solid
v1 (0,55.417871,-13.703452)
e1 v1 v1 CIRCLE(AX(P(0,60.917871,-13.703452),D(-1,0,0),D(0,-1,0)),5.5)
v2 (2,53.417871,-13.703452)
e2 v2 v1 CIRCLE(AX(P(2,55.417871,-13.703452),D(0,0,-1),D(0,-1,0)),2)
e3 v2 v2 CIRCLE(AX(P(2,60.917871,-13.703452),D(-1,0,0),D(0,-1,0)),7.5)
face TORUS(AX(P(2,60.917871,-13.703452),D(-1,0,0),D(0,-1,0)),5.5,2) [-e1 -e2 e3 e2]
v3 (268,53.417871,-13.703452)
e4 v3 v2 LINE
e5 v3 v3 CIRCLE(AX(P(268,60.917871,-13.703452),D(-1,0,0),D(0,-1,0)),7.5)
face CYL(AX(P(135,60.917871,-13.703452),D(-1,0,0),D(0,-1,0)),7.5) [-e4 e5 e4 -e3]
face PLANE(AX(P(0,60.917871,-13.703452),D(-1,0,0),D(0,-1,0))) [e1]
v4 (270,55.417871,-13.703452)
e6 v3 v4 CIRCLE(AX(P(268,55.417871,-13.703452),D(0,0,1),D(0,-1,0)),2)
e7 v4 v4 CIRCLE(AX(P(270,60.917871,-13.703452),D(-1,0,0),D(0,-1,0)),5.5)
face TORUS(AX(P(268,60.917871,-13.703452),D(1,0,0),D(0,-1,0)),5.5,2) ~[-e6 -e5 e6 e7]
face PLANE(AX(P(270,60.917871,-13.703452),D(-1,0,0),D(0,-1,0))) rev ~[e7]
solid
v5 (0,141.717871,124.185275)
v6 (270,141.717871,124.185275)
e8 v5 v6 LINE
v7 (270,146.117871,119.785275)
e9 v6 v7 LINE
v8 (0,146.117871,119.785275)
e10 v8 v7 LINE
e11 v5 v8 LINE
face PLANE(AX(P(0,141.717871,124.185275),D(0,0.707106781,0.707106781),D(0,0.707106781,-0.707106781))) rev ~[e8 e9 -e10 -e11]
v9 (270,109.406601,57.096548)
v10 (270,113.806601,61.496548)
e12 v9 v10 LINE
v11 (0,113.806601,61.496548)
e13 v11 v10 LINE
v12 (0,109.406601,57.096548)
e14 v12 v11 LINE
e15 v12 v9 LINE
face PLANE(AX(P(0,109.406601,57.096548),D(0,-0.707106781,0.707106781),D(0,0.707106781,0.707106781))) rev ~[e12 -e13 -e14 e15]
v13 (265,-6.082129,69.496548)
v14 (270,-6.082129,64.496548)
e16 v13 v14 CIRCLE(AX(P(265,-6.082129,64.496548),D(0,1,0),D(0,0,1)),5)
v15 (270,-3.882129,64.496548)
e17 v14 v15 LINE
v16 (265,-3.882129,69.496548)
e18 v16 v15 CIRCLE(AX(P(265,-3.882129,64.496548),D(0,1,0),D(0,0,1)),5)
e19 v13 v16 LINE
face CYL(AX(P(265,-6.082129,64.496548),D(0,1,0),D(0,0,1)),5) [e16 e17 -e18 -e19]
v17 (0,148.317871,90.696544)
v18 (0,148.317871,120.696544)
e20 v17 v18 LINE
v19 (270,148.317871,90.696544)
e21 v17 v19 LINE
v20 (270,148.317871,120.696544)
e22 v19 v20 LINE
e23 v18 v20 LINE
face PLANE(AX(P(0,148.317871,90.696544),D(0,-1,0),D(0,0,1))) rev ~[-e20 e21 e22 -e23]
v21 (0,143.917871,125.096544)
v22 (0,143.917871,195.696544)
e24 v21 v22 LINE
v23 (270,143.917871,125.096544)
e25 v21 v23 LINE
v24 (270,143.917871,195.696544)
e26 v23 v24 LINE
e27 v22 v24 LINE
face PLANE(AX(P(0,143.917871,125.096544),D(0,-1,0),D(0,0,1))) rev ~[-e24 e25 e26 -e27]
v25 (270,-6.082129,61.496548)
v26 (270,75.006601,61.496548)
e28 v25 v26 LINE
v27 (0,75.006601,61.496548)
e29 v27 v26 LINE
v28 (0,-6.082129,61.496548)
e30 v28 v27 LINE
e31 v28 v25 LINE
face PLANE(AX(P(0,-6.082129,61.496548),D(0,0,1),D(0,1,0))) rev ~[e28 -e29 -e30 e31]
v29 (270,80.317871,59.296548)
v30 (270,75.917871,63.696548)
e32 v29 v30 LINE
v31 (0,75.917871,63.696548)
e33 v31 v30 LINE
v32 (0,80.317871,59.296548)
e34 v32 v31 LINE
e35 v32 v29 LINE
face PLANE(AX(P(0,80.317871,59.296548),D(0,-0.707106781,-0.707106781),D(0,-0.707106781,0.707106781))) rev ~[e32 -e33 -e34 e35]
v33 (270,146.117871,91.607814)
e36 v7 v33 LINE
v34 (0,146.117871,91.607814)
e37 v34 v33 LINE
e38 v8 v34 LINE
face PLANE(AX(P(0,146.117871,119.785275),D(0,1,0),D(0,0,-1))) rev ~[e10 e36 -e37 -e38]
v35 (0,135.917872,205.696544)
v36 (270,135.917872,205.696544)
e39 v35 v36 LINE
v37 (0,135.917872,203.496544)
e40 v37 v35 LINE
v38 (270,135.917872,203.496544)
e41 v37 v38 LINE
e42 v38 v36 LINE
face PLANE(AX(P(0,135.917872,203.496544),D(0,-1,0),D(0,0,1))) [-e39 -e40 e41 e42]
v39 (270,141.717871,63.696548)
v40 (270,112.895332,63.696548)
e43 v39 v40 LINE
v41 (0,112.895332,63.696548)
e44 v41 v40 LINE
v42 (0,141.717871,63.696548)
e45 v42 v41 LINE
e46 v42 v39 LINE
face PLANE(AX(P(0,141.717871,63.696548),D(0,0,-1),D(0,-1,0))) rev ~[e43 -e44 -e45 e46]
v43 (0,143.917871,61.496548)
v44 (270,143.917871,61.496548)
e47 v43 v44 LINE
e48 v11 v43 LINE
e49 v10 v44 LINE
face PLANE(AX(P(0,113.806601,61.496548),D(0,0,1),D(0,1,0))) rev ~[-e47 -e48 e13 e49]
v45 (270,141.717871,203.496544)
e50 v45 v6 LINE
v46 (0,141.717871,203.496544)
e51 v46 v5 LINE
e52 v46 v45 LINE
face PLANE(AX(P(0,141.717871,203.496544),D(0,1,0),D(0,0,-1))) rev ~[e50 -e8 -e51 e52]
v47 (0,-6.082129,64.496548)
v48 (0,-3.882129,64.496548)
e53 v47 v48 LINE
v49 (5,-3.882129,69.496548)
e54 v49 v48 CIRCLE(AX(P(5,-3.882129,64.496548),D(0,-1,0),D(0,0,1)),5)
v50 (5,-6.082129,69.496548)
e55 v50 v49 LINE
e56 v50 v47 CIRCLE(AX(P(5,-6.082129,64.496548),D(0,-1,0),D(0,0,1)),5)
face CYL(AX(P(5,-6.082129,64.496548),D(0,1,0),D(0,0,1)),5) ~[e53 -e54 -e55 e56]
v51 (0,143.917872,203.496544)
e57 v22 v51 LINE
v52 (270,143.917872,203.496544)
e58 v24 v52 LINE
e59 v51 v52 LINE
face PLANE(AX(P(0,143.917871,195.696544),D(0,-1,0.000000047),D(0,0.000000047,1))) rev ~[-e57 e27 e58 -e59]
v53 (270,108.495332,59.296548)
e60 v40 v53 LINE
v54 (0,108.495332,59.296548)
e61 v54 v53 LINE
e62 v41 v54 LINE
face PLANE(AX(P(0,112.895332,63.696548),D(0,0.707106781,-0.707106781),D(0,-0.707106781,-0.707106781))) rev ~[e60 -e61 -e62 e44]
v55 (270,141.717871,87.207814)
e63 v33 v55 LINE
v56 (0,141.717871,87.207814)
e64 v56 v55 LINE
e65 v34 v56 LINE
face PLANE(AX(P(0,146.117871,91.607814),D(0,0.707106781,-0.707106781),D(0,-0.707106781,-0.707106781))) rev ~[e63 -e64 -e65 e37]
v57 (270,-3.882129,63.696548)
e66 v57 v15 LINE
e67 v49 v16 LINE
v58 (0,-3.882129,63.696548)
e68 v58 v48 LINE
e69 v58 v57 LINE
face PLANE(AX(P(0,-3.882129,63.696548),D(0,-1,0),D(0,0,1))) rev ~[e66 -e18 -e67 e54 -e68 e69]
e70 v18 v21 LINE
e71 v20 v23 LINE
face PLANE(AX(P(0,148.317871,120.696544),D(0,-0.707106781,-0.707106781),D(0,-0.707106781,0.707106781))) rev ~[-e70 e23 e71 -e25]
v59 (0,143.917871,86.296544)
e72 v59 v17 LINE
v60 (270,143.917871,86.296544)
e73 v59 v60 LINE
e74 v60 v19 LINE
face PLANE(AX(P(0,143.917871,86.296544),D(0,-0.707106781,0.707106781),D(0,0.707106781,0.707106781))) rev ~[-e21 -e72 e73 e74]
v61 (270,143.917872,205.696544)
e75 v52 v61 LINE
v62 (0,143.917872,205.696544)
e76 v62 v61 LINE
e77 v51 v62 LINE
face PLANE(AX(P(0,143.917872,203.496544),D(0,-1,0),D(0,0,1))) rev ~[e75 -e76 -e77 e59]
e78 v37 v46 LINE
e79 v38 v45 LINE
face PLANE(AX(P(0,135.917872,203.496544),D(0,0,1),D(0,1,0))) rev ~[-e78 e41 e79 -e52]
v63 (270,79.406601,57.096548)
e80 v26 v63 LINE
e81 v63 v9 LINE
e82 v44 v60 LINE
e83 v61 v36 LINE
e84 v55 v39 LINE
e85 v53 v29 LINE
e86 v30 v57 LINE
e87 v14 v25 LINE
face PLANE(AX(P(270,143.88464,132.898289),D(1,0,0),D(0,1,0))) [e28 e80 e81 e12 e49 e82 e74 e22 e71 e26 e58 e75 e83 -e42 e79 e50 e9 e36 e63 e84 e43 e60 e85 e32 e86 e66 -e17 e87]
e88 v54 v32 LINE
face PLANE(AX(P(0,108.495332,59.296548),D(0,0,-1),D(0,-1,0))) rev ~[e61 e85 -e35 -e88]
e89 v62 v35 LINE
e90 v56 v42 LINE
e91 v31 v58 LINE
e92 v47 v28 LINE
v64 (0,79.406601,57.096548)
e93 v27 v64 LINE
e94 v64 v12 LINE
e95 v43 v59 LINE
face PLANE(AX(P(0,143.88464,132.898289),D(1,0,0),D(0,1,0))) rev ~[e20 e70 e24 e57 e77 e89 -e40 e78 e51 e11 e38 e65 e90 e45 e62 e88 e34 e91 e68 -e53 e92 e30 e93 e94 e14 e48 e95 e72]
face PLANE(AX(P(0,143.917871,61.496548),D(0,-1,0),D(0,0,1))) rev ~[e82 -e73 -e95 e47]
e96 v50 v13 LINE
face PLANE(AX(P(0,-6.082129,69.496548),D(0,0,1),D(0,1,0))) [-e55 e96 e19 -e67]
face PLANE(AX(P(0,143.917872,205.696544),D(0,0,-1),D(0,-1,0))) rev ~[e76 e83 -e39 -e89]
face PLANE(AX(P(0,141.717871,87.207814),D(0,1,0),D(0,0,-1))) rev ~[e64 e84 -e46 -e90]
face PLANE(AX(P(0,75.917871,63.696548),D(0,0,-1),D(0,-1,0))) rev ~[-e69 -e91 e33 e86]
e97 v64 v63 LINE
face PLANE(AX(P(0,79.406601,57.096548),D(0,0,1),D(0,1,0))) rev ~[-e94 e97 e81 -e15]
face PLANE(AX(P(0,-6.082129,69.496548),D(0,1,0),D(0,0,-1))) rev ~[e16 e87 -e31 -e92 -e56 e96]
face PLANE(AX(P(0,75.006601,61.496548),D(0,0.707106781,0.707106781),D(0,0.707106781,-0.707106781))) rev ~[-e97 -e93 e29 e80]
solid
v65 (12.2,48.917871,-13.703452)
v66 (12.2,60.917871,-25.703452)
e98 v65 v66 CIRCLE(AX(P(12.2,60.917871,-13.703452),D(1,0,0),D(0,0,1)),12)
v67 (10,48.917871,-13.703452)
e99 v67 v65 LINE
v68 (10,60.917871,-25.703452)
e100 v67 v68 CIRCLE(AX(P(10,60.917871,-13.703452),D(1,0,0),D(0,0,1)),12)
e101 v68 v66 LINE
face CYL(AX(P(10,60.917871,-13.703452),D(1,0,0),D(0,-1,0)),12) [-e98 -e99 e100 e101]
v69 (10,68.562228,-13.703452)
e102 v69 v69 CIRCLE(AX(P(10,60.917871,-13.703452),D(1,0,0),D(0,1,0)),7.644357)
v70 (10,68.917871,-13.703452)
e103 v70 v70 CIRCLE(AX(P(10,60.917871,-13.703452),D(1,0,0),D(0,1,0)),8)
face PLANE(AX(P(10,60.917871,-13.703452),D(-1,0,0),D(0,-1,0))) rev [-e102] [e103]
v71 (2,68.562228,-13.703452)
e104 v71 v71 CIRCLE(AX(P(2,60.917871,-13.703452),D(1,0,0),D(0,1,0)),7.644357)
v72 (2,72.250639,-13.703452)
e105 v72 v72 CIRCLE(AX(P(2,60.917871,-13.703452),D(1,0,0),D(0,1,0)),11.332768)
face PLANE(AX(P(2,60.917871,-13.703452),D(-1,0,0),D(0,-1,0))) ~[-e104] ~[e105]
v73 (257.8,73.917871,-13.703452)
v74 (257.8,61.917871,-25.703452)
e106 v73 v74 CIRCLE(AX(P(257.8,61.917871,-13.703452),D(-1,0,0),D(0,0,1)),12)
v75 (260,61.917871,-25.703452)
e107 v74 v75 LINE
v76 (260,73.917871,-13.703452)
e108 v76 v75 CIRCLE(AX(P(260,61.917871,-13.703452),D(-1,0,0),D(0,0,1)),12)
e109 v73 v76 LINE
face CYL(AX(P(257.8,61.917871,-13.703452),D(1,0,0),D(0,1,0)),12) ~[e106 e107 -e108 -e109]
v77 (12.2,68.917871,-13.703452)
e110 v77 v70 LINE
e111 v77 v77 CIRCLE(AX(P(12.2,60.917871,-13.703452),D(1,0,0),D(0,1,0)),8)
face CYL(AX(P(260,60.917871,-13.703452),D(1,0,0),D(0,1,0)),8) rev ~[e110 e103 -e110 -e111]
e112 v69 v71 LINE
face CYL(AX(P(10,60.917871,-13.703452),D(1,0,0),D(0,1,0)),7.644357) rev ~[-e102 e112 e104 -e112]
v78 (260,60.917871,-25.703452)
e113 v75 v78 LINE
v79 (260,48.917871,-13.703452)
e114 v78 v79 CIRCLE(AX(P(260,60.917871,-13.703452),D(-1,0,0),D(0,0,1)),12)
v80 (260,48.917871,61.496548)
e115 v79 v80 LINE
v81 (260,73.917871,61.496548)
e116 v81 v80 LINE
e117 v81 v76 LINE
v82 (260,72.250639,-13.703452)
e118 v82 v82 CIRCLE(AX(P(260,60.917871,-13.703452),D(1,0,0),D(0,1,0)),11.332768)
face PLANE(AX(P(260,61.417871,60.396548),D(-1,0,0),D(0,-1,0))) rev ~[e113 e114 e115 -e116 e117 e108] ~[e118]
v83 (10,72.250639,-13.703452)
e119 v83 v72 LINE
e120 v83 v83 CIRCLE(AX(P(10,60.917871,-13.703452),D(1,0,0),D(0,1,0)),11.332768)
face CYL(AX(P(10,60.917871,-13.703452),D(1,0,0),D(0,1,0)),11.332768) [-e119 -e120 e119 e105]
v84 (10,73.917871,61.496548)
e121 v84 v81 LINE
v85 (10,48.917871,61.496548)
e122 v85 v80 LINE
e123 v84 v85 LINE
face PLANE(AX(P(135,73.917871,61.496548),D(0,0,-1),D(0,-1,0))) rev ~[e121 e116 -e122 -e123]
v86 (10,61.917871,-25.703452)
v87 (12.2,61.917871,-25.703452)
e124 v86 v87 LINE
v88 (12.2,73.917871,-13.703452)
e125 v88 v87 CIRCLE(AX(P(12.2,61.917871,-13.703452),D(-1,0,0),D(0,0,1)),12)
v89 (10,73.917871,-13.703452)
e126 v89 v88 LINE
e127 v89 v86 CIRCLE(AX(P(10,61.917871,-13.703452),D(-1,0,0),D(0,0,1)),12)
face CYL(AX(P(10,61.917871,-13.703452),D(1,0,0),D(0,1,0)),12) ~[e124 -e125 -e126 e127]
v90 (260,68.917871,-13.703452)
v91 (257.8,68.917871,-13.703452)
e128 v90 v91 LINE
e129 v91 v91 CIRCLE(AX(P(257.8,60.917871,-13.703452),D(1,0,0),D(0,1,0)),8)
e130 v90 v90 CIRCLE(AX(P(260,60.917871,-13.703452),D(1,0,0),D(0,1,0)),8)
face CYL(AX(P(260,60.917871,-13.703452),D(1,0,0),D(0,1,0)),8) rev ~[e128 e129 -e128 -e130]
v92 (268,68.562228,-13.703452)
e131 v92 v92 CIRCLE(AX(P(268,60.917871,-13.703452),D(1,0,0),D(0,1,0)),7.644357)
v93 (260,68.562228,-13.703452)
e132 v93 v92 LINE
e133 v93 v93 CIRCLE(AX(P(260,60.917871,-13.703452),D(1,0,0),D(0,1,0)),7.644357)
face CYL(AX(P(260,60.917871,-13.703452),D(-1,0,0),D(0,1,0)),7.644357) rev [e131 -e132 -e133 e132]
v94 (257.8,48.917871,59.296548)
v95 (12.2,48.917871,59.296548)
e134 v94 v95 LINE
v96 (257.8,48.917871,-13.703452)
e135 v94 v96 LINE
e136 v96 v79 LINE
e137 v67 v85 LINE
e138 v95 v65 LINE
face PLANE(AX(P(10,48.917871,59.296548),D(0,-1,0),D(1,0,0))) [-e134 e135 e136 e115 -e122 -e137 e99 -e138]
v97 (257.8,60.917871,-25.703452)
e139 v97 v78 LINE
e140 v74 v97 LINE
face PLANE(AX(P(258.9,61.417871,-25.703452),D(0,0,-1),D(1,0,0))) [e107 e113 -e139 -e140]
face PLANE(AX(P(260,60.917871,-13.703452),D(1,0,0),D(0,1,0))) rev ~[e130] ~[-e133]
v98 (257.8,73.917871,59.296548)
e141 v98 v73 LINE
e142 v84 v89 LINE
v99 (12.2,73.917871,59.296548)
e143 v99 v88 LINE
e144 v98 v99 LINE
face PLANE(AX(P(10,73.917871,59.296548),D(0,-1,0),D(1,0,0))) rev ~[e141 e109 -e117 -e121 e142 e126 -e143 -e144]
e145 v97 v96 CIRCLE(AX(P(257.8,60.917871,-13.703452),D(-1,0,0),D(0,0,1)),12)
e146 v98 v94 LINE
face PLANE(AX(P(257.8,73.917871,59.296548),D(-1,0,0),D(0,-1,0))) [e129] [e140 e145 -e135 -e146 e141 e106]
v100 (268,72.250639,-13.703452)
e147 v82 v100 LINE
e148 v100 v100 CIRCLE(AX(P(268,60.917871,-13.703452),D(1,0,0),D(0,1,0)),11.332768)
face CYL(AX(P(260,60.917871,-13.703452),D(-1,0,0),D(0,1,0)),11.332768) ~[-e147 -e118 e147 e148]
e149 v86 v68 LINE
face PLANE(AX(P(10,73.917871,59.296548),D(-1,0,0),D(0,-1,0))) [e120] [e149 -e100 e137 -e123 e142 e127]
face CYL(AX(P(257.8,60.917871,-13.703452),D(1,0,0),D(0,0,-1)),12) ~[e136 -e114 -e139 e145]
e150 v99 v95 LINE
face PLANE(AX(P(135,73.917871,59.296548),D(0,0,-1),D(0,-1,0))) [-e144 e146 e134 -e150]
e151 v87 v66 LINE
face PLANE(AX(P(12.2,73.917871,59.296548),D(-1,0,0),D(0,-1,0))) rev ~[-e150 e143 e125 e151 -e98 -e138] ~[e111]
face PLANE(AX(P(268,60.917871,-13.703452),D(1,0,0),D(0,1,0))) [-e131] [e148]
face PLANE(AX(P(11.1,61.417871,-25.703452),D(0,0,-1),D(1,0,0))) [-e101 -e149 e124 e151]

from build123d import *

# Parameters (mm, degrees)
F0_W           = 2.200000473
F0_H           = 2.2
F0_W_2         = 5.799999054
F0_W_3         = 2.2
F0_H_2         = 5.8
F1_DEPTH       = 270
F3_W           = 25
F3_H           = 2.2
F4_DEPTH       = 125
F4_DEPTH_BACK  = 125
F5_W           = 2.2
F5_H           = 25
F6_DEPTH       = 85
F7_R           = 12
F8_R           = 8
F9_DEPTH       = 260.001
F10_R          = 5
F11_R          = 7.5
F12_DEPTH      = 135
F12_DEPTH_BACK = 135
F13_R          = 2
F14_R          = 11.3327676894
F14_R_2        = 7.6443567425
F15_DEPTH      = 8


# Not quite as in the source:
# - ends of sketch curves that miss each other by under 0.0002 mm in the source are joined


with BuildPart() as f1:
    # F0 (on Right) → F1 (new body)
    with BuildSketch(Plane.YZ):
        Polygon((148.3178712445, 90.6965444131), (148.3178712445, 120.6965444131), (143.9178712445, 125.0965444131), (143.9178712445, 195.6965444131), (143.9178716134, 203.4965444131), (141.7178712445, 203.4965444131), (141.7178712445, 124.1852745758), (146.1178712445, 119.7852745758), (146.1178712445, 91.6078142503), (141.7178712445, 87.2078142503), (141.7178712445, 63.6965476274), (143.9178712445, 63.6965476274), (143.9178712445, 86.2965444131), align=None)
        Polygon((143.9178712445, 61.4965476274), (143.9178712445, 63.6965476274), (141.7178712445, 63.6965476274), (112.89533157, 63.6965476274), (108.49533157, 59.2965476274), (80.3178712445, 59.2965476274), (75.9178712445, 63.6965476274), (-3.8821287555, 63.6965476274), (-3.8821287555, 61.4965476274), (75.0066014072, 61.4965476274), (79.4066014072, 57.0965476274), (109.4066014072, 57.0965476274), (113.8066014072, 61.4965476274), align=None)
        with Locations((142.817871481, 204.5965444131)):
            Rectangle(F0_W, F0_H)
        with Locations((138.8178717175, 204.5965444131)):
            Rectangle(F0_W_2, F0_H)
        with Locations((-4.9821287555, 66.5965476274)):
            Rectangle(F0_W_3, F0_H_2)
        with Locations((-4.9821287555, 62.5965476274)):
            Rectangle(F0_W_3, F0_H)
    extrude(amount=F1_DEPTH)

    # F10
    f10_edges = [f1.edges().sort_by_distance(p)[0] for p in [
        (270, -4.982129, 69.496548),
        (0, -4.982129, 69.496548),
    ]]
    fillet(f10_edges, radius=F10_R)


with BuildPart() as f4:
    # F3 (on offset) → F4 (new body, two sides)
    with BuildSketch(Plane(origin=(135, 0, 0), x_dir=(0, -1, 0), z_dir=(-1, 0, 0))) as f4_sk:
        with Locations((-61.4178712445, 60.3965476274)):
            Rectangle(F3_W, F3_H)
    extrude(amount=F4_DEPTH)
    extrude(f4_sk.sketch, amount=-F4_DEPTH_BACK)

    # F5 (on face) → F6 (join)
    with BuildSketch(Plane(origin=(0, 0, 59.2965476274), x_dir=(1, 0, 0), z_dir=(0, 0, -1))):
        with Locations((11.1, -61.4178712445)):
            Rectangle(F5_W, F5_H)
        with Locations((258.9, -61.4178712445)):
            Rectangle(F5_W, F5_H)
    extrude(amount=F6_DEPTH)

    # F7
    f7_edges = [f4.edges().sort_by_distance(p)[0] for p in [
        (258.9, 48.917871, -25.703452),
        (258.9, 73.917871, -25.703452),
        (11.1, 48.917871, -25.703452),
        (11.1, 73.917871, -25.703452),
    ]]
    fillet(f7_edges, radius=F7_R)

    # F8 (on face) → F9 (cut, through all)
    with BuildSketch(Plane.YZ.offset(260)):
        with Locations((60.9178712445, -13.7034523726)):
            Circle(F8_R)
    extrude(amount=-F9_DEPTH, mode=Mode.SUBTRACT)

    # F14 (on face) → F15 (join)
    with BuildSketch(Plane.YZ.offset(260)):
        with Locations((60.9178712445, -13.7034523726)):
            Circle(F14_R)
        with Locations((60.9178712445, -13.7034523726)):
            Circle(F14_R_2, mode=Mode.SUBTRACT)
    extrude(amount=F15_DEPTH)

    # F16: F4 across plane


with BuildPart() as f12:
    # F11 (on offset) → F12 (new body, two sides)
    with BuildSketch(Plane(origin=(135, 0, 0), x_dir=(0, -1, 0), z_dir=(-1, 0, 0))) as f12_sk:
        with Locations((-60.9178712445, -13.7034523726)):
            Circle(F11_R)
    extrude(amount=F12_DEPTH)
    extrude(f12_sk.sketch, amount=-F12_DEPTH_BACK)

    # F13
    f13_edges = [f12.edges().sort_by_distance(p)[0] for p in [
        (270, 68.417871, -13.703452),
        (0, 68.417871, -13.703452),
    ]]
    fillet(f13_edges, radius=F13_R)


with BuildPart() as f4_1:
    add(f4.part)
    add(f4.part.mirror(Plane(origin=(135, 104.2623457429, 98.2578018151), x_dir=(0, 1, 0), z_dir=(-1, 0, 0))))


solid = Compound([f1.part, f12.part, f4_1.part])
